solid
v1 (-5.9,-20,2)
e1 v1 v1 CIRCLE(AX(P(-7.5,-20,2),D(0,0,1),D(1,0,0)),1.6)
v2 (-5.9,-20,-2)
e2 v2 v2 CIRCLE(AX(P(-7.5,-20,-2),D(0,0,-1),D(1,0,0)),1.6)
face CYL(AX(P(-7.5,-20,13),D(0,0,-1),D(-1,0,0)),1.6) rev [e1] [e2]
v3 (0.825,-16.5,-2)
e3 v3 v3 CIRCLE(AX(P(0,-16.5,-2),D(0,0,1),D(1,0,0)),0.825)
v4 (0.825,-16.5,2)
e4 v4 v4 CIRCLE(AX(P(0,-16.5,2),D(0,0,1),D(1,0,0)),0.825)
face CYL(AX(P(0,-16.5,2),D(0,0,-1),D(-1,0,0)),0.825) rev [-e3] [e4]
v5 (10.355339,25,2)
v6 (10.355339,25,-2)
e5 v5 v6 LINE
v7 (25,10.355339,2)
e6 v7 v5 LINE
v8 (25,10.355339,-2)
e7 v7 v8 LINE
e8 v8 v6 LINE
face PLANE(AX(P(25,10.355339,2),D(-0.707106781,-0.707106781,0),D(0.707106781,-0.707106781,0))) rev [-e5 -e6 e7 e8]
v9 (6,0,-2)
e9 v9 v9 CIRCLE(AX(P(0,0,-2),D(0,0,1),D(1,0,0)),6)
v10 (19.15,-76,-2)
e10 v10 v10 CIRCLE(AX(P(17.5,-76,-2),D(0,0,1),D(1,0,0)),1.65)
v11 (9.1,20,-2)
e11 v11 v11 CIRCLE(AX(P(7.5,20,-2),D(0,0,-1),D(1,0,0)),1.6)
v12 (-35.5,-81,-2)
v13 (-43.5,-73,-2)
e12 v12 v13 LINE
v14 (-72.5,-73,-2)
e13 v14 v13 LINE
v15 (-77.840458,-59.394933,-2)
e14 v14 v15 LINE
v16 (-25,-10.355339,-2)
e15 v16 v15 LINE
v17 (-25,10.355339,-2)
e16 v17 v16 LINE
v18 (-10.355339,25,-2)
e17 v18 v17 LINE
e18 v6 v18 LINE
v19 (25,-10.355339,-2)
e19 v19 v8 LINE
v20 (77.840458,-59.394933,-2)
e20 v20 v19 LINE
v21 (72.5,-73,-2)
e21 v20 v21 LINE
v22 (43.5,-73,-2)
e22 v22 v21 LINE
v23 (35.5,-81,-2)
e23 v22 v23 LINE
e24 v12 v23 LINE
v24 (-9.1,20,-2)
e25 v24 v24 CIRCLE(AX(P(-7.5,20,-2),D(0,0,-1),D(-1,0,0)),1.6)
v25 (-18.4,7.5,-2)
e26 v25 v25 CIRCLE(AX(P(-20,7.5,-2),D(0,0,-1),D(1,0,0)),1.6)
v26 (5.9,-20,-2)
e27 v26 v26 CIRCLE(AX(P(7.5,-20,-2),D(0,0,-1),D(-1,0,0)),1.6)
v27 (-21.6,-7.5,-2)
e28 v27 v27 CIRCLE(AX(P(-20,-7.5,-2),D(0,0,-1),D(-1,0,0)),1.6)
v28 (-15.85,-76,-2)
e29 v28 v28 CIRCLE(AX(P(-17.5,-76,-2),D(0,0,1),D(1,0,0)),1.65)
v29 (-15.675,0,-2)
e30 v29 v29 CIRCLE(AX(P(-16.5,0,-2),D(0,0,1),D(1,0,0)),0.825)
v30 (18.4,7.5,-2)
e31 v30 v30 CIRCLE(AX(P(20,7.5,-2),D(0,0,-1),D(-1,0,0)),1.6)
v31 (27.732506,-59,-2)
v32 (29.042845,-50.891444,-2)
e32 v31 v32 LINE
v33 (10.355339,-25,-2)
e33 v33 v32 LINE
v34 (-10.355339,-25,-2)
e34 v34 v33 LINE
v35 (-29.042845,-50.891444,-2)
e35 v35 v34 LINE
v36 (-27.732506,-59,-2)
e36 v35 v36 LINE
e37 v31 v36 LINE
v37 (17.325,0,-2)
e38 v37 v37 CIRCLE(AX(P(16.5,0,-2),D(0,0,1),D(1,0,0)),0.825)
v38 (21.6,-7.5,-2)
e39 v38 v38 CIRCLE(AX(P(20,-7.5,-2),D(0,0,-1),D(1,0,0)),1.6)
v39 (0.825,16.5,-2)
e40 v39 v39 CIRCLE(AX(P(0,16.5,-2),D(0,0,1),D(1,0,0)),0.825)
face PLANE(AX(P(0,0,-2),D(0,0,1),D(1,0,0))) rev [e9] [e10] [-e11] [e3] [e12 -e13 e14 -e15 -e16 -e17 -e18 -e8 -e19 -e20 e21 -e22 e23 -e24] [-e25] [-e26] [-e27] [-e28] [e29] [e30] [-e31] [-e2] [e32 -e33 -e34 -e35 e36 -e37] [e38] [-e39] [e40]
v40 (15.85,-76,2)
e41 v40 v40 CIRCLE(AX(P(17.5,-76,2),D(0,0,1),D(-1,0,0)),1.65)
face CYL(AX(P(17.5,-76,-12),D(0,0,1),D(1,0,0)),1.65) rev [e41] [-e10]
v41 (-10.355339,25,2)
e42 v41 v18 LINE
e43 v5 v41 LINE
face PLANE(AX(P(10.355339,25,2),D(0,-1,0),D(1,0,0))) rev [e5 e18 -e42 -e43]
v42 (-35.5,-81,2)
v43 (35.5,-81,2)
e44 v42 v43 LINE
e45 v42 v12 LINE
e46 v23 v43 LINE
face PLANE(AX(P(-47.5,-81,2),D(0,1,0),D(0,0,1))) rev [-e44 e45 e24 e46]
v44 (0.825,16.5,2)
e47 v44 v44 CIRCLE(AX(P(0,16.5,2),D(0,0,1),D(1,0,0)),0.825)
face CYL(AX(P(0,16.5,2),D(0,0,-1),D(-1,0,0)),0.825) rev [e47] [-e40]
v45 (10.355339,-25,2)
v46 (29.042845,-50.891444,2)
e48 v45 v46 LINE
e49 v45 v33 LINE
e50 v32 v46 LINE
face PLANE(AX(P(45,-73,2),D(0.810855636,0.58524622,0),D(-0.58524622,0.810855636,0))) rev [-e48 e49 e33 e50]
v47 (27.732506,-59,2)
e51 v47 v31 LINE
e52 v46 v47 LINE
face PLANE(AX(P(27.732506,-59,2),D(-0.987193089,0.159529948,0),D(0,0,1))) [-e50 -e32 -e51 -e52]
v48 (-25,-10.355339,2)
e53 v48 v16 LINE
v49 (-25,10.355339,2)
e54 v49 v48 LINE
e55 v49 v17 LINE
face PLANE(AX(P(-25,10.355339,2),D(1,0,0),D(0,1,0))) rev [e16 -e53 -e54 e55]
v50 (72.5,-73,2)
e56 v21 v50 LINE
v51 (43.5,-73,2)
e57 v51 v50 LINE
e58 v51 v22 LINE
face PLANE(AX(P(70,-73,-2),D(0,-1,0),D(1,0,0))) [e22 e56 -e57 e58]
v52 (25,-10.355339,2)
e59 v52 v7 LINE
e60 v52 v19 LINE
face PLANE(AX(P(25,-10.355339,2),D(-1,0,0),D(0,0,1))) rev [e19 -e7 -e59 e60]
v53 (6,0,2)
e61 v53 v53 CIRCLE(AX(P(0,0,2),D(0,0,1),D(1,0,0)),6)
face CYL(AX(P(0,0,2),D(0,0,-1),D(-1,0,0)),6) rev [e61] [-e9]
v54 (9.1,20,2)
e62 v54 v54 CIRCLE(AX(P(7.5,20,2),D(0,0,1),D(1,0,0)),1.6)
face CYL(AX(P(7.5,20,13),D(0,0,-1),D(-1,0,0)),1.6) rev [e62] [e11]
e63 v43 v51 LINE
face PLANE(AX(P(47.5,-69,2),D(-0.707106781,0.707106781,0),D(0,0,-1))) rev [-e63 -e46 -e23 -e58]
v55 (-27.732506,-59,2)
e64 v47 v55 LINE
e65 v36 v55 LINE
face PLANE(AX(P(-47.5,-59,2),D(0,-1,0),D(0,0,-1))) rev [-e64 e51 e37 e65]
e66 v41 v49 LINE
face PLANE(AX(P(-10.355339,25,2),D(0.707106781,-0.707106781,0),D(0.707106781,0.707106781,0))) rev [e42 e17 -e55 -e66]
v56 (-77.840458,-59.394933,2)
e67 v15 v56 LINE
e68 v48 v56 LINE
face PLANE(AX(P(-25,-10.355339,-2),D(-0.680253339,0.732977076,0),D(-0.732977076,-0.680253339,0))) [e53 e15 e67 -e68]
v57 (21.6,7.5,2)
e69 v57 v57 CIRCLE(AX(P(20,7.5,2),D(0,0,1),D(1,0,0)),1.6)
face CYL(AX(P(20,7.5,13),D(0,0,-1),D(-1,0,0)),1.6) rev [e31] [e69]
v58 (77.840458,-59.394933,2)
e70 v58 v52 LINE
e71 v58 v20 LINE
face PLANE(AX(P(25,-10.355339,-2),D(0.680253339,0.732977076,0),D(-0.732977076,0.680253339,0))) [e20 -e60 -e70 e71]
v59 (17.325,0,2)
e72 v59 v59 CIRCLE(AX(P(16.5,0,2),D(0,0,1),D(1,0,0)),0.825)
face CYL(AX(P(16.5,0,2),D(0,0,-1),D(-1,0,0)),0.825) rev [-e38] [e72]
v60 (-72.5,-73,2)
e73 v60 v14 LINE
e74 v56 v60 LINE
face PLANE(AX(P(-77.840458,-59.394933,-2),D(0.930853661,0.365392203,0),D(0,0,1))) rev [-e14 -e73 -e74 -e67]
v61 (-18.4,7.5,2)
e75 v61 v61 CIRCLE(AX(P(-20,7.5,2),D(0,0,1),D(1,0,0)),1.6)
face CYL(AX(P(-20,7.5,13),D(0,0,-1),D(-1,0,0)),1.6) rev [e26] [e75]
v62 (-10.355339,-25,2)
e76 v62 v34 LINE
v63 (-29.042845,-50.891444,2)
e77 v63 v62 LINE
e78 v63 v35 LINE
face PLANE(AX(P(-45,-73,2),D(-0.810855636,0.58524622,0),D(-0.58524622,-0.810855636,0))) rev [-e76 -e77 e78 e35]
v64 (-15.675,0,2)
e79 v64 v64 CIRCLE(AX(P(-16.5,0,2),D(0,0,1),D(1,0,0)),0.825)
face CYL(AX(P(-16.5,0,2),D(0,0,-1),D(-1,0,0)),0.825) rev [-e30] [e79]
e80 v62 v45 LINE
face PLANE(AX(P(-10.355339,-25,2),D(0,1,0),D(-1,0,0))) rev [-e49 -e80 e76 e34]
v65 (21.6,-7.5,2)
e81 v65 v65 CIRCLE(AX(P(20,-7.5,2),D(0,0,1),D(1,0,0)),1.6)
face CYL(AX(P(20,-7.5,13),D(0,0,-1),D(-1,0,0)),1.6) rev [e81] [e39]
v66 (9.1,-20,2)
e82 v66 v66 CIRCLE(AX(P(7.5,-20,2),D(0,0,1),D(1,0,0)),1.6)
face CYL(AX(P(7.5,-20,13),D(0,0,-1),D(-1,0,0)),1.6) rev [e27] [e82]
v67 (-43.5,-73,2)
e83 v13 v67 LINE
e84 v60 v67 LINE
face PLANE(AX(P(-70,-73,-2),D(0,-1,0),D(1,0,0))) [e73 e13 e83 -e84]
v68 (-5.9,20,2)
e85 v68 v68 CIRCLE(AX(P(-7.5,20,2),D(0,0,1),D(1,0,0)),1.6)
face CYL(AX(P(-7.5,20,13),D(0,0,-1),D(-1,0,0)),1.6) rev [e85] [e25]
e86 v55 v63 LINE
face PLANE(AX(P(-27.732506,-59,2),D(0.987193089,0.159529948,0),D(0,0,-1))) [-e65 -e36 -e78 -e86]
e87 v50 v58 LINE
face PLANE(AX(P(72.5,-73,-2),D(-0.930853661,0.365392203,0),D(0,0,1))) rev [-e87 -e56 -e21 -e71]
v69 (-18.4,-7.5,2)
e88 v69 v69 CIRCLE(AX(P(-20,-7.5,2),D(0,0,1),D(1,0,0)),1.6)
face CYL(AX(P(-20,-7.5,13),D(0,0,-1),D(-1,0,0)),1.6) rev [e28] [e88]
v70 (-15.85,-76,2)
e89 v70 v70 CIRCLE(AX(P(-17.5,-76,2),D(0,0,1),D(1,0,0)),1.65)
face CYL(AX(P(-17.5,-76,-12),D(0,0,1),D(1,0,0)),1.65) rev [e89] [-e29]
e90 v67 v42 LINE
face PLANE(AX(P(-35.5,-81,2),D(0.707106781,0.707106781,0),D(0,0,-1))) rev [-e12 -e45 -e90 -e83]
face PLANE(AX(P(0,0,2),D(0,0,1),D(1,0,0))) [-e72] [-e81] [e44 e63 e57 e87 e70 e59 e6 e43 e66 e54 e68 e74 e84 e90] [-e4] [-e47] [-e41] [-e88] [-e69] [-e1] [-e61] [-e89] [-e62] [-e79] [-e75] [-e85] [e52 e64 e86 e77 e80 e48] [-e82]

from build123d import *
from OCP.BRepFilletAPI import BRepFilletAPI_MakeChamfer

# Parameters (mm, degrees)
SKETCH_2_R          = 0.825
SKETCH_2_R_2        = 6
EXTRUDE_1_DEPTH     = 2
SKETCH_4_R          = 1.6
CUT_EXTRUDE_1_DEPTH = 15
EXTRUDE_2_DEPTH     = 2
EXTRUDE_3_DEPTH     = 2
CHAMFER_2_SIZE      = 20
SKETCH_8_W          = 95
SKETCH_8_H          = 22
EXTRUDE_4_DEPTH     = 2
CHAMFER_3_SIZE      = 12
CHAMFER_4_SIZE      = 10
CHAMFER_4_SIZE2     = 7.162801166
SKETCH_10_R         = 1.65
CUT_EXTRUDE_2_DEPTH = 14


with BuildPart() as part:
    # 草图2 → 凸台-拉伸1 (new, symmetric)
    with BuildSketch(Plane.XY):
        Polygon((10.355339059, 25), (-10.355339059, 25), (-25, 10.355339059), (-25, -10.355339059), (-10.355339059, -25), (10.355339059, -25), (25, -10.355339059), (25, 10.355339059), align=None)
        with Locations((-16.5, 0)):
            Circle(SKETCH_2_R, mode=Mode.SUBTRACT)
        with Locations((0, 16.5)):
            Circle(SKETCH_2_R, mode=Mode.SUBTRACT)
        with Locations((16.5, 0)):
            Circle(SKETCH_2_R, mode=Mode.SUBTRACT)
        with Locations((0, -16.5)):
            Circle(SKETCH_2_R, mode=Mode.SUBTRACT)
        Circle(SKETCH_2_R_2, mode=Mode.SUBTRACT)
    extrude(amount=EXTRUDE_1_DEPTH, both=True)

    # 草图4 → 切除-拉伸1 (cut)
    with BuildSketch(Plane(origin=(0, 0, -2), x_dir=(-1, 0, 0), z_dir=(0, 0, -1))):
        with Locations((-7.5, -20)):
            Circle(SKETCH_4_R)
        with Locations(Location((7.5, -20, 0), (0, 0, 180))):
            Circle(SKETCH_4_R)
        with Locations((-20, 7.5)):
            Circle(SKETCH_4_R)
        with Locations(Location((-20, -7.5, 0), (0, 0, 180))):
            Circle(SKETCH_4_R)
        with Locations((7.5, 20)):
            Circle(SKETCH_4_R)
        with Locations(Location((-7.5, 20, 0), (0, 0, 180))):
            Circle(SKETCH_4_R)
        with Locations((20, -7.5)):
            Circle(SKETCH_4_R)
        with Locations(Location((20, 7.5, 0), (0, 0, 180))):
            Circle(SKETCH_4_R)
    extrude(amount=-CUT_EXTRUDE_1_DEPTH, mode=Mode.SUBTRACT)

    # 草图5 → 凸台-拉伸2 (add, symmetric)
    with BuildSketch(Plane.XY):
        Polygon((-25, -10.355339059), (-92.5, -73), (-70, -73), (-16.17766953, -19.17766953), align=None)
        Polygon((70, -73), (92.5, -73), (25, -10.355339059), (16.17766953, -19.17766953), align=None)
    extrude(amount=EXTRUDE_2_DEPTH, both=True)

    # 草图6 → 凸台-拉伸3 (add, symmetric)
    with BuildSketch(Plane.XY):
        Polygon((-70, -73), (-45, -73), (-10.355339059, -25), (-16.17766953, -19.17766953), align=None)
        Polygon((70, -73), (16.17766953, -19.17766953), (10.355339059, -25), (45, -73), align=None)
    extrude(amount=EXTRUDE_3_DEPTH, both=True)

    # 倒角2
    chamfer_2_edges = [part.edges().sort_by_distance(p)[0] for p in [
        (-92.5, -73, 0),
        (92.5, -73, 0),
    ]]
    chamfer(chamfer_2_edges, length=CHAMFER_2_SIZE)

    # 草图8 → 凸台-拉伸4 (add, symmetric)
    with BuildSketch(Plane.XY):
        with Locations((0, -70)):
            Rectangle(SKETCH_8_W, SKETCH_8_H)
    extrude(amount=EXTRUDE_4_DEPTH, both=True)

    # 倒角3
    # the kernel refuses this chamfer: 12 mm, written as the material it takes off along each edge
    with BuildSketch(Plane(origin=(47.5, -81, -32.860195856), x_dir=(0.02749587661058619, 0.9996219169112968, 0), z_dir=(0, 0, 1))) as chamfer_3_piece_1_section:
        Polygon((CHAMFER_3_SIZE * 0.999621916911, CHAMFER_3_SIZE * 0.0274958766106), (-CHAMFER_3_SIZE * 0.0274958766106, CHAMFER_3_SIZE * 0.999621916911), (0, 0), align=None)
    chamfer_3_piece_1 = extrude(amount=65.720391711, mode=Mode.PRIVATE)
    chamfer_3_piece_1 = split(chamfer_3_piece_1, bisect_by=Plane(origin=(43.13163598, -73, 0), z_dir=(0, -1, 0)), keep=Keep.TOP, mode=Mode.PRIVATE)
    add(chamfer_3_piece_1, mode=Mode.SUBTRACT)
    with BuildSketch(Plane(origin=(-47.5, -81, 32.860195856), x_dir=(-0.02749587661058619, 0.9996219169112968, 0), z_dir=(0, 0, -1))) as chamfer_3_piece_2_section:
        Polygon((CHAMFER_3_SIZE * 0.999621916911, CHAMFER_3_SIZE * 0.0274958766106), (-CHAMFER_3_SIZE * 0.0274958766106, CHAMFER_3_SIZE * 0.999621916911), (0, 0), align=None)
    chamfer_3_piece_2 = extrude(amount=65.720391711, mode=Mode.PRIVATE)
    chamfer_3_piece_2 = split(chamfer_3_piece_2, bisect_by=Plane(origin=(-43.13163598, -73, 0), z_dir=(0, -1, 0)), keep=Keep.TOP, mode=Mode.PRIVATE)
    add(chamfer_3_piece_2, mode=Mode.SUBTRACT)

    # 倒角4: one chamfer whose edges measure the first distance from different faces: ONE call of the kernel's chamfer builder (chamfer() names one face for all edges)
    chamfer_4_edges_1 = [part.edges().sort_by_distance(p)[0] for p in [
        (34.895307226, -59, 0),
    ]]
    chamfer_4_side_1 = [part.faces().sort_by_distance(p)[0] for p in [
        (22.625323142, -42, 0),
    ]]
    chamfer_4_edges_2 = [part.edges().sort_by_distance(p)[0] for p in [
        (-34.895307226, -59, 0),
    ]]
    chamfer_4_side_2 = [part.faces().sort_by_distance(p)[0] for p in [
        (-22.625323142, -42, 0),
    ]]
    chamfer_4 = BRepFilletAPI_MakeChamfer(part.part.solid().wrapped)
    for e in chamfer_4_edges_1:
        chamfer_4.Add(CHAMFER_4_SIZE, CHAMFER_4_SIZE2, e.wrapped, chamfer_4_side_1[0].wrapped)  # the first distance lies on this face
    for e in chamfer_4_edges_2:
        chamfer_4.Add(CHAMFER_4_SIZE, CHAMFER_4_SIZE2, e.wrapped, chamfer_4_side_2[0].wrapped)  # the first distance lies on this face
    add(Compound.cast(chamfer_4.Shape()), mode=Mode.REPLACE)

    # 草图10 → 切除-拉伸2 (cut)
    with BuildSketch(Plane.XY.offset(2)):
        with Locations((-17.5, -76)):
            Circle(SKETCH_10_R)
        with Locations((17.5, -76)):
            Circle(SKETCH_10_R)
    extrude(amount=-CUT_EXTRUDE_2_DEPTH, mode=Mode.SUBTRACT)


solid = part.part
